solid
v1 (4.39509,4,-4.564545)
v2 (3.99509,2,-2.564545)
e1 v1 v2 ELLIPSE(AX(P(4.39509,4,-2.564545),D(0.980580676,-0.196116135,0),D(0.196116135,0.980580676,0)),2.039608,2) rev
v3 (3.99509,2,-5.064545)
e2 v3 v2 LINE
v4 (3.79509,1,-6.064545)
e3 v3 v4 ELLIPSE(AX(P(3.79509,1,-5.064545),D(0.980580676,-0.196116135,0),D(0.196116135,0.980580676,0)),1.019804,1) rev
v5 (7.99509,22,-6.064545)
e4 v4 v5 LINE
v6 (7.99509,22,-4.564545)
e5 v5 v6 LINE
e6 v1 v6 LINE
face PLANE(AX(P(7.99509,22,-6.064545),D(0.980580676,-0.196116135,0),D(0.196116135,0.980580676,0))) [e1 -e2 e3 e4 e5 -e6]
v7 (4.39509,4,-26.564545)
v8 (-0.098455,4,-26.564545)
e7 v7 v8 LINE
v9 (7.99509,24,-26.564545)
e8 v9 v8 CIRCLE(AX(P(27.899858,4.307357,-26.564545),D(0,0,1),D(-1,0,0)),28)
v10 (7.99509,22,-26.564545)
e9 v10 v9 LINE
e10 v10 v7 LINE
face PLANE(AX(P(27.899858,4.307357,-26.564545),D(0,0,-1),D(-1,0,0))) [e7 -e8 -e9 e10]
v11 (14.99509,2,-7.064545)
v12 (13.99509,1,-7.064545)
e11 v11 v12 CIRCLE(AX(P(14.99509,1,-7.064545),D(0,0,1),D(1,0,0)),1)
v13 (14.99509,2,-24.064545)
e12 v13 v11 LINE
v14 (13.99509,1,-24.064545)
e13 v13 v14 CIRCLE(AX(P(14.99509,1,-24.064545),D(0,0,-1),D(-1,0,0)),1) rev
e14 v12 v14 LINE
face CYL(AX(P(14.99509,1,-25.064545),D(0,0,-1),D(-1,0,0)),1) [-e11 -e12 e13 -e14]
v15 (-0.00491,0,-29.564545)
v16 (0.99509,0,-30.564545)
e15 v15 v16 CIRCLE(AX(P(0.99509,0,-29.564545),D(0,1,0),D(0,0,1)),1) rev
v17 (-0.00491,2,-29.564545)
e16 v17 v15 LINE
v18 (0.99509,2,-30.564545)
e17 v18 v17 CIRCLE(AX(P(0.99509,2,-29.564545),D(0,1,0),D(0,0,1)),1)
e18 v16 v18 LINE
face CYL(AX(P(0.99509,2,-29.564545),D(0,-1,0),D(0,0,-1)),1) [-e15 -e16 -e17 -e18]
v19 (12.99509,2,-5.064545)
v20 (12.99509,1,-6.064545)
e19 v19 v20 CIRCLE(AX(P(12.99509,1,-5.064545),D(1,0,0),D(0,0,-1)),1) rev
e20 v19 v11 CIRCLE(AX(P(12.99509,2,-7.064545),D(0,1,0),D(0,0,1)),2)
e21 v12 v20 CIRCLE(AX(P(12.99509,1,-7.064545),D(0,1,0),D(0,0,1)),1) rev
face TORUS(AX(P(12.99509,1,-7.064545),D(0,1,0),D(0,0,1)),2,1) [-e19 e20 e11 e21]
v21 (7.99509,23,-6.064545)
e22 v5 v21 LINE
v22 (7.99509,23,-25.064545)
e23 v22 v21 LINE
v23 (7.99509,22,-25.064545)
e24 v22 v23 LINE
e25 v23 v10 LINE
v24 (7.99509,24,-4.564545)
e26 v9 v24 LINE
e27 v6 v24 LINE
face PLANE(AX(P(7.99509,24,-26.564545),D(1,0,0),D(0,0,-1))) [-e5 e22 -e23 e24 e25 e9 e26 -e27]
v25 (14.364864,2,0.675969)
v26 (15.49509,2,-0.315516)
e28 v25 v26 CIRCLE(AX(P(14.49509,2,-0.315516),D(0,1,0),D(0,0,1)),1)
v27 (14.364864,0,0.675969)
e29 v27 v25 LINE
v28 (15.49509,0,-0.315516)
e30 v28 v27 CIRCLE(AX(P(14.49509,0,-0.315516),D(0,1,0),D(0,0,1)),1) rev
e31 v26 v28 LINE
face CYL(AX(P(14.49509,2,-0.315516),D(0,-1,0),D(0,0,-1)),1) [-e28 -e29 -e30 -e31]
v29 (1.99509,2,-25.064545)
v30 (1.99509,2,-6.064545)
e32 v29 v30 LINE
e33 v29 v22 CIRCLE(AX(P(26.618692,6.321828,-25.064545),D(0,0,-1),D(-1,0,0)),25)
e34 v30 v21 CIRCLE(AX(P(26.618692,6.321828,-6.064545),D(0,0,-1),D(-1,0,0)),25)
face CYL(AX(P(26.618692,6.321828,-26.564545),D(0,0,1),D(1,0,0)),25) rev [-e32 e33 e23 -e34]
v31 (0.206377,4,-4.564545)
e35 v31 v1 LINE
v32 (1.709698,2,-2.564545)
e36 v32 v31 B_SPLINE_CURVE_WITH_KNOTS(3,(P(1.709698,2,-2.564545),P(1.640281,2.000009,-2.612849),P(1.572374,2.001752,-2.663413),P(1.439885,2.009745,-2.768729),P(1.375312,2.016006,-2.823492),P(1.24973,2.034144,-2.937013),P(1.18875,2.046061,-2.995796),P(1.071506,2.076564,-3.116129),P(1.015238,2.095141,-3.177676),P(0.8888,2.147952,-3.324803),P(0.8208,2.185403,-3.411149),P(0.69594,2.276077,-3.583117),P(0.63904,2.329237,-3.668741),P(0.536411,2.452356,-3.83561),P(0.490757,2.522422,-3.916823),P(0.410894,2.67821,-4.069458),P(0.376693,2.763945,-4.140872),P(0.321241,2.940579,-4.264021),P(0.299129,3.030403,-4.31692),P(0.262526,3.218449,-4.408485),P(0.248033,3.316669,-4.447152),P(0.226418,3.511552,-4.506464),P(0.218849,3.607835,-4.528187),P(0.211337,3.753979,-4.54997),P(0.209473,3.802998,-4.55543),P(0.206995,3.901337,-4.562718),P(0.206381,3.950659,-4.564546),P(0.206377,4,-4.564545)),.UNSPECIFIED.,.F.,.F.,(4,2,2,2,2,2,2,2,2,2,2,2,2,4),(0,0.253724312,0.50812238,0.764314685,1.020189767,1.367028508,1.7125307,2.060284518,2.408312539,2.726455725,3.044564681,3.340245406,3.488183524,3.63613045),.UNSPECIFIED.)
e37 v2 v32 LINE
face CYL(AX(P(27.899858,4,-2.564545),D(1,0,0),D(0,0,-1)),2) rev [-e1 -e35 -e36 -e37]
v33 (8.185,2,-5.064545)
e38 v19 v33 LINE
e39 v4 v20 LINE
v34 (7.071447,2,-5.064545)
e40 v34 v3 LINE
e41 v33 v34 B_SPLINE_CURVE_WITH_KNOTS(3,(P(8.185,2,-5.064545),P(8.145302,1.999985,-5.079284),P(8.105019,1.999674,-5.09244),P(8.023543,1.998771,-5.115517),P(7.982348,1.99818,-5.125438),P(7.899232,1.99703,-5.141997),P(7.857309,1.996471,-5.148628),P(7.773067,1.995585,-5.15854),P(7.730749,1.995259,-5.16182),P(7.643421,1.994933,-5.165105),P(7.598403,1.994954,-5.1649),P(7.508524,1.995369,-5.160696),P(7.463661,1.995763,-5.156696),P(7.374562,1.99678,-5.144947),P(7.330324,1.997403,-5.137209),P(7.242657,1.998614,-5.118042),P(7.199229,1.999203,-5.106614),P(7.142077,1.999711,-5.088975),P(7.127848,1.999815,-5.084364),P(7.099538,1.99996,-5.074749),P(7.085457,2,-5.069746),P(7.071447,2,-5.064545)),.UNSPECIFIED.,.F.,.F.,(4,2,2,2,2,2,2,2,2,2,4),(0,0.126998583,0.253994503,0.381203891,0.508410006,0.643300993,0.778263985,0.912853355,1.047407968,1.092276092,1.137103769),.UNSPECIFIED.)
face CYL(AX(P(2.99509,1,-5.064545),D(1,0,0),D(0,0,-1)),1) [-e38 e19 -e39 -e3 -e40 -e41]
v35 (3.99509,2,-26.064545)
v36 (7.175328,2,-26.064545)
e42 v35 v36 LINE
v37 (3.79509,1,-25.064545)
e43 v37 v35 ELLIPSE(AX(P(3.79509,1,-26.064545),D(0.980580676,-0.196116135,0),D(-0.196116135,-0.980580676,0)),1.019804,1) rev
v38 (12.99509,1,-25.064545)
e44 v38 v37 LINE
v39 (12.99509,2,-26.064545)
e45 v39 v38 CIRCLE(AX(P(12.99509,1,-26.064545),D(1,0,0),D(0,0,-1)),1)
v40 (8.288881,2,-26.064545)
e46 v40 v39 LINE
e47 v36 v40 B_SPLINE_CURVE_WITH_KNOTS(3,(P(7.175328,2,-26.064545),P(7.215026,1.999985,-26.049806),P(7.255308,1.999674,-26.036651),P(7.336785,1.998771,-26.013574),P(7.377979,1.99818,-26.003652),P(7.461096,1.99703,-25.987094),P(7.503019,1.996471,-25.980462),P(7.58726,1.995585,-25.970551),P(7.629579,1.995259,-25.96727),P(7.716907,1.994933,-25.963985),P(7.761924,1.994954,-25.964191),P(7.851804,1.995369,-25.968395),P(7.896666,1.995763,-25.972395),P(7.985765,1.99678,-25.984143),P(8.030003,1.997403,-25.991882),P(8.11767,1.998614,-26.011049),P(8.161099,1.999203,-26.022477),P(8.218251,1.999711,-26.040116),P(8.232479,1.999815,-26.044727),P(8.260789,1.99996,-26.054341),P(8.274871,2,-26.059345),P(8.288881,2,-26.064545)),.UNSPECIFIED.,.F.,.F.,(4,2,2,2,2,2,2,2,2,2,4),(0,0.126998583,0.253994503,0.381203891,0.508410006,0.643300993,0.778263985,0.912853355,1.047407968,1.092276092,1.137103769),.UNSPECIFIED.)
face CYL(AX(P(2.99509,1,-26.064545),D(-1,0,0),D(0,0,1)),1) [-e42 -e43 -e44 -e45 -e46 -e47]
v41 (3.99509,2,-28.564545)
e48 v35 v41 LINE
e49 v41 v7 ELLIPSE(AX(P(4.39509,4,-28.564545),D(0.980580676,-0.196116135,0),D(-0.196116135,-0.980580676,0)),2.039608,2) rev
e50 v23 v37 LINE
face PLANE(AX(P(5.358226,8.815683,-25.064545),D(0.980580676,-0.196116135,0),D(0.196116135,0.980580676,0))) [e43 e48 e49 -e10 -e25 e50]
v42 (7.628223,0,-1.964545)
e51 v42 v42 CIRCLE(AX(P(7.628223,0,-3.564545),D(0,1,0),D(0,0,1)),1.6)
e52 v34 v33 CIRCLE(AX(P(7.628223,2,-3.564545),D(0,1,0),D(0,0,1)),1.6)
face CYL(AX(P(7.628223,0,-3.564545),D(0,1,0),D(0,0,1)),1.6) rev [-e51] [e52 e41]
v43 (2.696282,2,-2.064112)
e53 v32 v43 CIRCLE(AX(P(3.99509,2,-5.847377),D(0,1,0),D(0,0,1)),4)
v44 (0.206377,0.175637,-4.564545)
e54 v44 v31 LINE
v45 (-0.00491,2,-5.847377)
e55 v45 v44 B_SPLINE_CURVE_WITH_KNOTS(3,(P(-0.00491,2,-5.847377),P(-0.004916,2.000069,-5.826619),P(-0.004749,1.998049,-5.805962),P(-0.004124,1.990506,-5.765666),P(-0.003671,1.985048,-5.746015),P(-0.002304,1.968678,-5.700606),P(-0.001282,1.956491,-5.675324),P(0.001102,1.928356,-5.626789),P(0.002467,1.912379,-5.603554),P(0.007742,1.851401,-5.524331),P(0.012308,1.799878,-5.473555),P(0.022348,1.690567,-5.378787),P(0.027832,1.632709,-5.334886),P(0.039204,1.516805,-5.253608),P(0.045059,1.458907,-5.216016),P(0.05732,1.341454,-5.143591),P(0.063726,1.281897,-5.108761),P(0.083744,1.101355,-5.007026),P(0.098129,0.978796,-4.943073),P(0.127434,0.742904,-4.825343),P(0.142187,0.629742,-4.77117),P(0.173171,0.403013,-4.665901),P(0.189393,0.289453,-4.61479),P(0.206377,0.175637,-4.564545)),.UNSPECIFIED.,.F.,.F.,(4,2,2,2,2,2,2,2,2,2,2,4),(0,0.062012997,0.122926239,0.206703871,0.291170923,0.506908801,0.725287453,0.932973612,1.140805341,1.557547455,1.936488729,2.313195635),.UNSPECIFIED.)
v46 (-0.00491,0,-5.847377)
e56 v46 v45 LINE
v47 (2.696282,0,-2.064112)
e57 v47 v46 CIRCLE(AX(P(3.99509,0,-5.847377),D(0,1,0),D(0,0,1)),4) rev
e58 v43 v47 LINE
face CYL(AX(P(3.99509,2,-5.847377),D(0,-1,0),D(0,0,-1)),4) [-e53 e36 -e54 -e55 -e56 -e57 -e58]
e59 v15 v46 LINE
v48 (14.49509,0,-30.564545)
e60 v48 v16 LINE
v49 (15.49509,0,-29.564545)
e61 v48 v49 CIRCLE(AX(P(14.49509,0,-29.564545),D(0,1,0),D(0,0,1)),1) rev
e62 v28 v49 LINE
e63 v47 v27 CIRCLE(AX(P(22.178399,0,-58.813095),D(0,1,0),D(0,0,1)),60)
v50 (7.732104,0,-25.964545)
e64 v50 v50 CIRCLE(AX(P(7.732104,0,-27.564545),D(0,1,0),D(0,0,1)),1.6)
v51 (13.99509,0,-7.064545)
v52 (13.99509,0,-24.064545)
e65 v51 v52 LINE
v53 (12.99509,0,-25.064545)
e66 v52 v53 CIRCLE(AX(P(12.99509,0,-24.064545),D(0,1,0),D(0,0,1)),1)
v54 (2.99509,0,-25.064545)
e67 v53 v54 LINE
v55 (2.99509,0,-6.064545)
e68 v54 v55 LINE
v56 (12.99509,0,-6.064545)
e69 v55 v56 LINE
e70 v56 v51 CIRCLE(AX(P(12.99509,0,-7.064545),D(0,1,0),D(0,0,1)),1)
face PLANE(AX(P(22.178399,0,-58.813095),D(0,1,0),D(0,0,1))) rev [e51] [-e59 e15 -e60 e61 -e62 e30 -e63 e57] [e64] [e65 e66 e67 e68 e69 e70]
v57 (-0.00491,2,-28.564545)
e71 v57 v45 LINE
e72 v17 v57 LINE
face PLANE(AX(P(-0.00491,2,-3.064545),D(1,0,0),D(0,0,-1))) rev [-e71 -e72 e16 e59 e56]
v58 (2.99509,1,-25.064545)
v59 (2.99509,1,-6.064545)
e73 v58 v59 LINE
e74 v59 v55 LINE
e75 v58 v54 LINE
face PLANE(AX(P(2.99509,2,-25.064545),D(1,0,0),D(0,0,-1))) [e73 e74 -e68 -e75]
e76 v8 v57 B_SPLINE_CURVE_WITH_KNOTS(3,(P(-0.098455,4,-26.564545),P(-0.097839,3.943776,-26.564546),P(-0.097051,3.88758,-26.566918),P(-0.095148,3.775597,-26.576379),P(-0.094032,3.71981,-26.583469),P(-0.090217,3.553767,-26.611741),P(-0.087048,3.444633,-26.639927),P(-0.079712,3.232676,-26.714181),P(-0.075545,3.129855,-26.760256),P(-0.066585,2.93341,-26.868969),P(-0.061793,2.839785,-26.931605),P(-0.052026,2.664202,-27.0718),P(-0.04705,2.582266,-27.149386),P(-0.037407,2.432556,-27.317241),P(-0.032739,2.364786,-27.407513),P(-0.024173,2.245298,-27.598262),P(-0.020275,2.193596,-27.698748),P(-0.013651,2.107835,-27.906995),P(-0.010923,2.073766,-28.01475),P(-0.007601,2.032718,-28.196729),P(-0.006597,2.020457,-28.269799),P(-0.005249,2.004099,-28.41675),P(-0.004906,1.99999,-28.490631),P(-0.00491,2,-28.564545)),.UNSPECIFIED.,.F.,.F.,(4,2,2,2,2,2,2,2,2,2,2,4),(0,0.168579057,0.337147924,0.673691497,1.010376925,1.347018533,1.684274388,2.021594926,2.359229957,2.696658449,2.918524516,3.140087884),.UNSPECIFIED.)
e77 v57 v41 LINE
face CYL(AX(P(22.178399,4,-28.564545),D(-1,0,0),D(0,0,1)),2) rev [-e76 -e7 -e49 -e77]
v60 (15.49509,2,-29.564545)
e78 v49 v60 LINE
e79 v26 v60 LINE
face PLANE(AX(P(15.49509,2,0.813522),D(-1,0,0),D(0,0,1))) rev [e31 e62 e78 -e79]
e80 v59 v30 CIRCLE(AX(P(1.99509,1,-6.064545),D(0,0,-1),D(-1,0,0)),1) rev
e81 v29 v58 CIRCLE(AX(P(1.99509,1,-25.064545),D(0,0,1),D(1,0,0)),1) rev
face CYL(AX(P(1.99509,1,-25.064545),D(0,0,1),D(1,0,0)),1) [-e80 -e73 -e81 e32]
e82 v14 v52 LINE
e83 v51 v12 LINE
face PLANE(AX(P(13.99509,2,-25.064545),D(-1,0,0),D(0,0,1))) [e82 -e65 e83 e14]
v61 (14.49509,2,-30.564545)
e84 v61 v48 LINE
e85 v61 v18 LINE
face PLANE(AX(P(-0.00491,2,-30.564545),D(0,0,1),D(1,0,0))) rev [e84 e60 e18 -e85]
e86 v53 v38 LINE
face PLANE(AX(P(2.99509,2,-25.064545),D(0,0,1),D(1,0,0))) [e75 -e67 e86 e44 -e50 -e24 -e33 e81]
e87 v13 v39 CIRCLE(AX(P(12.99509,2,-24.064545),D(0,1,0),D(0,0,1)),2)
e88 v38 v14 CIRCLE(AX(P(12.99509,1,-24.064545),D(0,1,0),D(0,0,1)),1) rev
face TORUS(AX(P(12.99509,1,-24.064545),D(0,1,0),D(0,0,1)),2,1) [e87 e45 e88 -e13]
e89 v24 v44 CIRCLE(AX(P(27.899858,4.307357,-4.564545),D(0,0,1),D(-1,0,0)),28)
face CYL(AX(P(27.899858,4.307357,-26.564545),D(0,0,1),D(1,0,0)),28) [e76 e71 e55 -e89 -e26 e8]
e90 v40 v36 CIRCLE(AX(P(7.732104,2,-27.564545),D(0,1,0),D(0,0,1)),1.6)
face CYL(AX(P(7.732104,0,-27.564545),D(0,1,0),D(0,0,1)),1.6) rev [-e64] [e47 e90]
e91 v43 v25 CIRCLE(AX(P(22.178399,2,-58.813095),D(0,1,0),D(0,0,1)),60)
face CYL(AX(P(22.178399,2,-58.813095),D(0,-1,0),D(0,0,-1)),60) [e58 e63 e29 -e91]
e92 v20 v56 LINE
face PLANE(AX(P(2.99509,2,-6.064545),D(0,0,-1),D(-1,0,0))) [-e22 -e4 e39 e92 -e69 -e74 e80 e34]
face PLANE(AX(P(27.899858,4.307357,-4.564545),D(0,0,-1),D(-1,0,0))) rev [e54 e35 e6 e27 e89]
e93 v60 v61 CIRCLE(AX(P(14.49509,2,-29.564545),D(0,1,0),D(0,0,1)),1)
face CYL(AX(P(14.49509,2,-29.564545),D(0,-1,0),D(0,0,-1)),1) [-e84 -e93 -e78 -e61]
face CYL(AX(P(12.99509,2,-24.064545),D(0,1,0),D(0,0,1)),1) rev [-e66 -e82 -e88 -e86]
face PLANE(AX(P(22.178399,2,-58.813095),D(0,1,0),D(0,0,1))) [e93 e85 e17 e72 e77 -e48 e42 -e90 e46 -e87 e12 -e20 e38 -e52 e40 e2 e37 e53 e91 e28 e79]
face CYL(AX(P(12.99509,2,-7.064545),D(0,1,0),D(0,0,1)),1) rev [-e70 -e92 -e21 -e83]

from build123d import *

# Parameters (mm, degrees)
SKETCH1_W                = 11
SKETCH1_H                = 19
BOSS_EXTRUDE1_DEPTH      = 2
BOSS_EXTRUDE2_DEPTH      = 11
BOSS_EXTRUDE2_DEPTH_BACK = 11
BOSS_EXTRUDE3_DEPTH      = 1.5
BOSS_EXTRUDE4_START      = -22
BOSS_EXTRUDE4_DEPTH      = 1.5
SKETCH4_R                = 1.6
CUT_EXTRUDE1_DEPTH       = 41.722097522
FILLET1_R                = 4
FILLET2_R                = 1
FILLET3_R                = 2


with BuildPart() as part:
    # Sketch1 → Boss-Extrude1 (new body)
    with BuildSketch(Plane(origin=(0, 0, 0), x_dir=(1, 0, 0), z_dir=(0, 1, 0))):
        with BuildLine():
            Line((-0.004910497, 3.064545275), (-0.004910497, 30.564545275))
            Line((-0.004910497, 30.564545275), (15.495089503, 30.564545275))
            Line((15.495089503, 30.564545275), (15.495089503, -0.81352161))
            ThreePointArc((15.495089503, -0.81352161), (7.615422876, 0.607255499), (-0.004910497, 3.064545275))
        make_face()
        with Locations((8.495089503, 15.564545275)):
            Rectangle(SKETCH1_W, SKETCH1_H, mode=Mode.SUBTRACT)
    extrude(amount=BOSS_EXTRUDE1_DEPTH)

    # Sketch2 → Boss-Extrude2 (add, two sides: drawn at the far end of the back side and taken through both)
    with BuildSketch(Plane.XY.offset(-15.564545275).offset(-BOSS_EXTRUDE2_DEPTH_BACK)):
        with BuildLine():
            Line((7.995089503, 24), (7.995089503, 23))
            ThreePointArc((7.995089503, 23), (2.580593395, 13.189856031), (1.995089503, 2))
            Line((1.995089503, 2), (-0.004910497, 2))
            ThreePointArc((-0.004910497, 2), (1.585642128, 13.876162682), (7.995089503, 24))
        make_face()
    extrude(amount=BOSS_EXTRUDE2_DEPTH + BOSS_EXTRUDE2_DEPTH_BACK)

    # Sketch3 → Boss-Extrude3 (add)
    with BuildSketch(Plane.XY.offset(-4.564545275)):
        with BuildLine():
            Line((7.995089503, 24), (7.995089503, 22))
            Line((7.995089503, 22), (3.995089503, 2))
            Line((3.995089503, 2), (-0.004910497, 2))
            ThreePointArc((-0.004910497, 2), (1.760688004, 13.812509636), (7.995089503, 24))
        make_face()
    extrude(amount=-BOSS_EXTRUDE3_DEPTH)

    # Sketch3<2> → Boss-Extrude4 (add)
    with BuildSketch(Plane.XY.offset(-4.564545275).offset(BOSS_EXTRUDE4_START)):
        with BuildLine():
            Line((7.995089503, 24), (7.995089503, 22))
            Line((7.995089503, 22), (3.995089503, 2))
            Line((3.995089503, 2), (-0.004910497, 2))
            ThreePointArc((-0.004910497, 2), (1.760688004, 13.812509636), (7.995089503, 24))
        make_face()
    extrude(amount=BOSS_EXTRUDE4_DEPTH)

    # Sketch4 → Cut-Extrude1 (cut, through all)
    with BuildSketch(Plane(origin=(0, 2, 0), x_dir=(1, 0, 0), z_dir=(0, 1, 0))):
        with Locations(Location((7.732104354, 27.564545275, 0), (0, 0, 270))):
            Circle(SKETCH4_R)
        with Locations(Location((7.628223159, 3.564545275, 0), (0, 0, 270))):
            Circle(SKETCH4_R)
    extrude(amount=-CUT_EXTRUDE1_DEPTH, mode=Mode.SUBTRACT)

    # Fillet1
    # the kernel refuses this fillet: 4 mm, written as the material it takes off along each edge
    with BuildSketch(Plane(origin=(-0.004910497, -7.201261458, -3.064545275), x_dir=(0, 0, -1), z_dir=(0, 1, 0))) as fillet1_piece_1_section:
        with BuildLine():
            CenterArc((2.782831809, -4), FILLET1_R, 90, 71.052480457)
            ThreePointArc((-1.000433732, -2.701192145), (-0.516429194, -1.344591553), (0, 0))
            Line((0, 0), (2.782831809, 0))
        make_face()
    fillet1_piece_1 = extrude(amount=16.402522916, mode=Mode.PRIVATE)
    fillet1_piece_1 = fillet1_piece_1 - Plane(origin=(27.899857986, 4.307356915, -4.929207358), x_dir=(-0.9965988743768334, -0.08240560412271017, 0), z_dir=(0, 0, -1)) * Cylinder(28, 44, mode=Mode.PRIVATE)
    add(fillet1_piece_1, mode=Mode.SUBTRACT)
    with BuildSketch(Plane(origin=(-0.004910497, -7.201261458, -3.064545275), x_dir=(0, 0, -1), z_dir=(0, 1, 0))) as fillet1_piece_2_section:
        with BuildLine():
            CenterArc((2.782831809, -4), FILLET1_R, 90, 71.052480457)
            ThreePointArc((-1.000433732, -2.701192145), (-0.516429194, -1.344591553), (0, 0))
            Line((0, 0), (2.782831809, 0))
        make_face()
    fillet1_piece_2 = extrude(amount=16.402522916, mode=Mode.PRIVATE)
    fillet1_piece_2 = split(fillet1_piece_2, bisect_by=Plane(origin=(0.675993318, 1.051688324, -4.564545275), z_dir=(0, 0, 1)), keep=Keep.TOP, mode=Mode.PRIVATE)
    add(fillet1_piece_2, mode=Mode.SUBTRACT)

    # Fillet2
    # the kernel refuses this fillet: 1 mm, written as the material it adds along each edge
    with BuildSketch(Plane(origin=(13.995089503, 0, -6.064545275), x_dir=(0, 0, -1), z_dir=(0, 1, 0)), Plane(origin=(13.995089503, 0, -25.064545275), x_dir=(-1, 0, 0), z_dir=(0, 1, 0))) as fillet2_piece_1:
        with BuildLine():
            CenterArc((FILLET2_R, FILLET2_R), FILLET2_R, 180, 90)
            Line((0, FILLET2_R), (0, 0))
            Line((0, 0), (FILLET2_R, 0))
        make_face()
    extrude(amount=2)
    # the kernel refuses this fillet: 1 mm, written as the material it takes off along each edge
    with BuildSketch(Plane(origin=(2.995089503, 2, -6.064545275), x_dir=(0, -1, 0), z_dir=(0, 0, -1))) as fillet2_2_piece_1:
        with BuildLine():
            CenterArc((FILLET2_R, FILLET2_R), FILLET2_R, 180, 90)
            Line((0, FILLET2_R), (0, 0))
            Line((0, 0), (FILLET2_R, 0))
        make_face()
    extrude(amount=19, mode=Mode.SUBTRACT)
    with BuildSketch(Plane(origin=(-0.004910497, -2.5, -30.564545275), x_dir=(0, 0, 1), z_dir=(0, 1, 0)), Plane(origin=(15.495089503, -2.5, -30.564545275), x_dir=(-1, 0, 0), z_dir=(0, 1, 0))) as fillet2_2_piece_2:
        with BuildLine():
            CenterArc((FILLET2_R, FILLET2_R), FILLET2_R, 180, 90)
            Line((0, FILLET2_R), (0, 0))
            Line((0, 0), (FILLET2_R, 0))
        make_face()
    extrude(amount=7, mode=Mode.SUBTRACT)
    with BuildSketch(Plane(origin=(15.495089503, -2.846412971, 0.81352161), x_dir=(0, 0, -1), z_dir=(0, 1, 0))) as fillet2_2_piece_3:
        with BuildLine():
            CenterArc((1.129037279, 1), FILLET2_R, 172.517371348, 97.482628652)
            ThreePointArc((0.137552889, 1.130225593), (0.066095477, 0.565439081), (0, 0))
            Line((0, 0), (1.129037279, 0))
        make_face()
    extrude(amount=7.692825941, mode=Mode.SUBTRACT)
    # the kernel refuses this fillet: 1 mm, written as the material it takes off along each edge
    with BuildSketch(Plane(origin=(12.995089503, 2, -6.064545275), x_dir=(0, 0, 1), z_dir=(-1, 0, 0))) as fillet2_3_piece_1_section:
        with BuildLine():
            CenterArc((FILLET2_R, -FILLET2_R), FILLET2_R, 90, 90)
            Line((0, -FILLET2_R), (0, 0))
            Line((0, 0), (FILLET2_R, 0))
        make_face()
    fillet2_3_piece_1 = extrude(amount=11.5, mode=Mode.PRIVATE)
    fillet2_3_piece_1 = split(fillet2_3_piece_1, bisect_by=Plane(origin=(4.123556577, 2.642335372, -5.838757255), z_dir=(0.9805806756909202, -0.19611613513818374, 0)), keep=Keep.TOP, mode=Mode.PRIVATE)
    add(fillet2_3_piece_1, mode=Mode.SUBTRACT)
    with BuildSketch(Plane(origin=(1.495089503, 2, -25.064545275), x_dir=(0, 0, -1), z_dir=(1, 0, 0))) as fillet2_3_piece_2_section:
        with BuildLine():
            CenterArc((FILLET2_R, -FILLET2_R), FILLET2_R, 90, 90)
            Line((0, -FILLET2_R), (0, 0))
            Line((0, 0), (FILLET2_R, 0))
        make_face()
    fillet2_3_piece_2 = extrude(amount=11.5, mode=Mode.PRIVATE)
    fillet2_3_piece_2 = split(fillet2_3_piece_2, bisect_by=Plane(origin=(4.123556577, 2.642335372, -25.290333294), z_dir=(0.9805806756909202, -0.19611613513818374, 0)), keep=Keep.TOP, mode=Mode.PRIVATE)
    add(fillet2_3_piece_2, mode=Mode.SUBTRACT)
    with BuildSketch(Plane(origin=(13.995089503, 2, -24.064545275), x_dir=(1, 0, 0), z_dir=(0, 0, 1))) as fillet2_3_piece_3:
        with BuildLine():
            CenterArc((FILLET2_R, -FILLET2_R), FILLET2_R, 90, 90)
            Line((0, -FILLET2_R), (0, 0))
            Line((0, 0), (FILLET2_R, 0))
        make_face()
    extrude(amount=17, mode=Mode.SUBTRACT)
    with BuildSketch(Plane(origin=(12.995089503, 2, -24.064545275), x_dir=(0, 0, -1), z_dir=(-1, 0, 0))) as fillet2_3_piece_4:
        with BuildLine():
            CenterArc((1 + FILLET2_R, FILLET2_R), FILLET2_R, 180, 90)
            Line((1, FILLET2_R), (1, 0))
            Line((1, 0), (1 + FILLET2_R, 0))
        make_face()
    revolve(axis=Axis((12.995089503, 2, -24.064545275), (0, -1, 0)), revolution_arc=90, mode=Mode.SUBTRACT)
    with BuildSketch(Plane(origin=(12.995089503, 2, -7.064545275), x_dir=(1, 0, 0), z_dir=(0, 0, -1))) as fillet2_3_piece_5:
        with BuildLine():
            CenterArc((1 + FILLET2_R, FILLET2_R), FILLET2_R, 180, 90)
            Line((1, FILLET2_R), (1, 0))
            Line((1, 0), (1 + FILLET2_R, 0))
        make_face()
    revolve(axis=Axis((12.995089503, 2, -7.064545275), (0, -1, 0)), revolution_arc=90, mode=Mode.SUBTRACT)

    # Fillet3
    # the kernel refuses this fillet: 2 mm, written as the material it adds along each edge
    with BuildSketch(Plane(origin=(8.995089503, 2, -4.564545275), x_dir=(0, 0, 1), z_dir=(-1, 0, 0))) as fillet3_piece_1_section:
        with BuildLine():
            CenterArc((FILLET3_R, FILLET3_R), FILLET3_R, 180, 90)
            Line((0, FILLET3_R), (0, 0))
            Line((0, 0), (FILLET3_R, 0))
        make_face()
    fillet3_piece_1 = extrude(amount=13.788712519, mode=Mode.PRIVATE)
    fillet3_piece_1 = fillet3_piece_1 & Plane(origin=(3.995089503, 2.466350157, -5.847377084), x_dir=(0, 0, -1), z_dir=(0, -1, 0)) * Cylinder(4, 36, mode=Mode.PRIVATE)
    fillet3_piece_1 = split(fillet3_piece_1, bisect_by=Plane(origin=(4.017419709, 2.111651029, -4.143772398), z_dir=(-0.9805806756909202, 0.19611613513818374, 0)), keep=Keep.TOP, mode=Mode.PRIVATE)
    add(fillet3_piece_1)
    with BuildSketch(Plane(origin=(-5.004910497, 2, -26.564545275), x_dir=(0, 0, -1), z_dir=(1, 0, 0))) as fillet3_piece_2_section:
        with BuildLine():
            CenterArc((FILLET3_R, FILLET3_R), FILLET3_R, 180, 90)
            Line((0, FILLET3_R), (0, 0))
            Line((0, 0), (FILLET3_R, 0))
        make_face()
    fillet3_piece_2 = extrude(amount=14, mode=Mode.PRIVATE)
    fillet3_piece_2 = fillet3_piece_2 & Plane(origin=(27.899857986, 4.307356915, -26.843512553), x_dir=(-0.9965988743768334, -0.08240560412271017, 0), z_dir=(0, 0, -1)) * Cylinder(28, 36, mode=Mode.PRIVATE)
    fillet3_piece_2 = split(fillet3_piece_2, bisect_by=Plane(origin=(3.978687185, 1.91798841, -26.843512553), z_dir=(-0.9805806756909202, 0.19611613513818374, 0)), keep=Keep.TOP, mode=Mode.PRIVATE)
    add(fillet3_piece_2)


solid = part.part
